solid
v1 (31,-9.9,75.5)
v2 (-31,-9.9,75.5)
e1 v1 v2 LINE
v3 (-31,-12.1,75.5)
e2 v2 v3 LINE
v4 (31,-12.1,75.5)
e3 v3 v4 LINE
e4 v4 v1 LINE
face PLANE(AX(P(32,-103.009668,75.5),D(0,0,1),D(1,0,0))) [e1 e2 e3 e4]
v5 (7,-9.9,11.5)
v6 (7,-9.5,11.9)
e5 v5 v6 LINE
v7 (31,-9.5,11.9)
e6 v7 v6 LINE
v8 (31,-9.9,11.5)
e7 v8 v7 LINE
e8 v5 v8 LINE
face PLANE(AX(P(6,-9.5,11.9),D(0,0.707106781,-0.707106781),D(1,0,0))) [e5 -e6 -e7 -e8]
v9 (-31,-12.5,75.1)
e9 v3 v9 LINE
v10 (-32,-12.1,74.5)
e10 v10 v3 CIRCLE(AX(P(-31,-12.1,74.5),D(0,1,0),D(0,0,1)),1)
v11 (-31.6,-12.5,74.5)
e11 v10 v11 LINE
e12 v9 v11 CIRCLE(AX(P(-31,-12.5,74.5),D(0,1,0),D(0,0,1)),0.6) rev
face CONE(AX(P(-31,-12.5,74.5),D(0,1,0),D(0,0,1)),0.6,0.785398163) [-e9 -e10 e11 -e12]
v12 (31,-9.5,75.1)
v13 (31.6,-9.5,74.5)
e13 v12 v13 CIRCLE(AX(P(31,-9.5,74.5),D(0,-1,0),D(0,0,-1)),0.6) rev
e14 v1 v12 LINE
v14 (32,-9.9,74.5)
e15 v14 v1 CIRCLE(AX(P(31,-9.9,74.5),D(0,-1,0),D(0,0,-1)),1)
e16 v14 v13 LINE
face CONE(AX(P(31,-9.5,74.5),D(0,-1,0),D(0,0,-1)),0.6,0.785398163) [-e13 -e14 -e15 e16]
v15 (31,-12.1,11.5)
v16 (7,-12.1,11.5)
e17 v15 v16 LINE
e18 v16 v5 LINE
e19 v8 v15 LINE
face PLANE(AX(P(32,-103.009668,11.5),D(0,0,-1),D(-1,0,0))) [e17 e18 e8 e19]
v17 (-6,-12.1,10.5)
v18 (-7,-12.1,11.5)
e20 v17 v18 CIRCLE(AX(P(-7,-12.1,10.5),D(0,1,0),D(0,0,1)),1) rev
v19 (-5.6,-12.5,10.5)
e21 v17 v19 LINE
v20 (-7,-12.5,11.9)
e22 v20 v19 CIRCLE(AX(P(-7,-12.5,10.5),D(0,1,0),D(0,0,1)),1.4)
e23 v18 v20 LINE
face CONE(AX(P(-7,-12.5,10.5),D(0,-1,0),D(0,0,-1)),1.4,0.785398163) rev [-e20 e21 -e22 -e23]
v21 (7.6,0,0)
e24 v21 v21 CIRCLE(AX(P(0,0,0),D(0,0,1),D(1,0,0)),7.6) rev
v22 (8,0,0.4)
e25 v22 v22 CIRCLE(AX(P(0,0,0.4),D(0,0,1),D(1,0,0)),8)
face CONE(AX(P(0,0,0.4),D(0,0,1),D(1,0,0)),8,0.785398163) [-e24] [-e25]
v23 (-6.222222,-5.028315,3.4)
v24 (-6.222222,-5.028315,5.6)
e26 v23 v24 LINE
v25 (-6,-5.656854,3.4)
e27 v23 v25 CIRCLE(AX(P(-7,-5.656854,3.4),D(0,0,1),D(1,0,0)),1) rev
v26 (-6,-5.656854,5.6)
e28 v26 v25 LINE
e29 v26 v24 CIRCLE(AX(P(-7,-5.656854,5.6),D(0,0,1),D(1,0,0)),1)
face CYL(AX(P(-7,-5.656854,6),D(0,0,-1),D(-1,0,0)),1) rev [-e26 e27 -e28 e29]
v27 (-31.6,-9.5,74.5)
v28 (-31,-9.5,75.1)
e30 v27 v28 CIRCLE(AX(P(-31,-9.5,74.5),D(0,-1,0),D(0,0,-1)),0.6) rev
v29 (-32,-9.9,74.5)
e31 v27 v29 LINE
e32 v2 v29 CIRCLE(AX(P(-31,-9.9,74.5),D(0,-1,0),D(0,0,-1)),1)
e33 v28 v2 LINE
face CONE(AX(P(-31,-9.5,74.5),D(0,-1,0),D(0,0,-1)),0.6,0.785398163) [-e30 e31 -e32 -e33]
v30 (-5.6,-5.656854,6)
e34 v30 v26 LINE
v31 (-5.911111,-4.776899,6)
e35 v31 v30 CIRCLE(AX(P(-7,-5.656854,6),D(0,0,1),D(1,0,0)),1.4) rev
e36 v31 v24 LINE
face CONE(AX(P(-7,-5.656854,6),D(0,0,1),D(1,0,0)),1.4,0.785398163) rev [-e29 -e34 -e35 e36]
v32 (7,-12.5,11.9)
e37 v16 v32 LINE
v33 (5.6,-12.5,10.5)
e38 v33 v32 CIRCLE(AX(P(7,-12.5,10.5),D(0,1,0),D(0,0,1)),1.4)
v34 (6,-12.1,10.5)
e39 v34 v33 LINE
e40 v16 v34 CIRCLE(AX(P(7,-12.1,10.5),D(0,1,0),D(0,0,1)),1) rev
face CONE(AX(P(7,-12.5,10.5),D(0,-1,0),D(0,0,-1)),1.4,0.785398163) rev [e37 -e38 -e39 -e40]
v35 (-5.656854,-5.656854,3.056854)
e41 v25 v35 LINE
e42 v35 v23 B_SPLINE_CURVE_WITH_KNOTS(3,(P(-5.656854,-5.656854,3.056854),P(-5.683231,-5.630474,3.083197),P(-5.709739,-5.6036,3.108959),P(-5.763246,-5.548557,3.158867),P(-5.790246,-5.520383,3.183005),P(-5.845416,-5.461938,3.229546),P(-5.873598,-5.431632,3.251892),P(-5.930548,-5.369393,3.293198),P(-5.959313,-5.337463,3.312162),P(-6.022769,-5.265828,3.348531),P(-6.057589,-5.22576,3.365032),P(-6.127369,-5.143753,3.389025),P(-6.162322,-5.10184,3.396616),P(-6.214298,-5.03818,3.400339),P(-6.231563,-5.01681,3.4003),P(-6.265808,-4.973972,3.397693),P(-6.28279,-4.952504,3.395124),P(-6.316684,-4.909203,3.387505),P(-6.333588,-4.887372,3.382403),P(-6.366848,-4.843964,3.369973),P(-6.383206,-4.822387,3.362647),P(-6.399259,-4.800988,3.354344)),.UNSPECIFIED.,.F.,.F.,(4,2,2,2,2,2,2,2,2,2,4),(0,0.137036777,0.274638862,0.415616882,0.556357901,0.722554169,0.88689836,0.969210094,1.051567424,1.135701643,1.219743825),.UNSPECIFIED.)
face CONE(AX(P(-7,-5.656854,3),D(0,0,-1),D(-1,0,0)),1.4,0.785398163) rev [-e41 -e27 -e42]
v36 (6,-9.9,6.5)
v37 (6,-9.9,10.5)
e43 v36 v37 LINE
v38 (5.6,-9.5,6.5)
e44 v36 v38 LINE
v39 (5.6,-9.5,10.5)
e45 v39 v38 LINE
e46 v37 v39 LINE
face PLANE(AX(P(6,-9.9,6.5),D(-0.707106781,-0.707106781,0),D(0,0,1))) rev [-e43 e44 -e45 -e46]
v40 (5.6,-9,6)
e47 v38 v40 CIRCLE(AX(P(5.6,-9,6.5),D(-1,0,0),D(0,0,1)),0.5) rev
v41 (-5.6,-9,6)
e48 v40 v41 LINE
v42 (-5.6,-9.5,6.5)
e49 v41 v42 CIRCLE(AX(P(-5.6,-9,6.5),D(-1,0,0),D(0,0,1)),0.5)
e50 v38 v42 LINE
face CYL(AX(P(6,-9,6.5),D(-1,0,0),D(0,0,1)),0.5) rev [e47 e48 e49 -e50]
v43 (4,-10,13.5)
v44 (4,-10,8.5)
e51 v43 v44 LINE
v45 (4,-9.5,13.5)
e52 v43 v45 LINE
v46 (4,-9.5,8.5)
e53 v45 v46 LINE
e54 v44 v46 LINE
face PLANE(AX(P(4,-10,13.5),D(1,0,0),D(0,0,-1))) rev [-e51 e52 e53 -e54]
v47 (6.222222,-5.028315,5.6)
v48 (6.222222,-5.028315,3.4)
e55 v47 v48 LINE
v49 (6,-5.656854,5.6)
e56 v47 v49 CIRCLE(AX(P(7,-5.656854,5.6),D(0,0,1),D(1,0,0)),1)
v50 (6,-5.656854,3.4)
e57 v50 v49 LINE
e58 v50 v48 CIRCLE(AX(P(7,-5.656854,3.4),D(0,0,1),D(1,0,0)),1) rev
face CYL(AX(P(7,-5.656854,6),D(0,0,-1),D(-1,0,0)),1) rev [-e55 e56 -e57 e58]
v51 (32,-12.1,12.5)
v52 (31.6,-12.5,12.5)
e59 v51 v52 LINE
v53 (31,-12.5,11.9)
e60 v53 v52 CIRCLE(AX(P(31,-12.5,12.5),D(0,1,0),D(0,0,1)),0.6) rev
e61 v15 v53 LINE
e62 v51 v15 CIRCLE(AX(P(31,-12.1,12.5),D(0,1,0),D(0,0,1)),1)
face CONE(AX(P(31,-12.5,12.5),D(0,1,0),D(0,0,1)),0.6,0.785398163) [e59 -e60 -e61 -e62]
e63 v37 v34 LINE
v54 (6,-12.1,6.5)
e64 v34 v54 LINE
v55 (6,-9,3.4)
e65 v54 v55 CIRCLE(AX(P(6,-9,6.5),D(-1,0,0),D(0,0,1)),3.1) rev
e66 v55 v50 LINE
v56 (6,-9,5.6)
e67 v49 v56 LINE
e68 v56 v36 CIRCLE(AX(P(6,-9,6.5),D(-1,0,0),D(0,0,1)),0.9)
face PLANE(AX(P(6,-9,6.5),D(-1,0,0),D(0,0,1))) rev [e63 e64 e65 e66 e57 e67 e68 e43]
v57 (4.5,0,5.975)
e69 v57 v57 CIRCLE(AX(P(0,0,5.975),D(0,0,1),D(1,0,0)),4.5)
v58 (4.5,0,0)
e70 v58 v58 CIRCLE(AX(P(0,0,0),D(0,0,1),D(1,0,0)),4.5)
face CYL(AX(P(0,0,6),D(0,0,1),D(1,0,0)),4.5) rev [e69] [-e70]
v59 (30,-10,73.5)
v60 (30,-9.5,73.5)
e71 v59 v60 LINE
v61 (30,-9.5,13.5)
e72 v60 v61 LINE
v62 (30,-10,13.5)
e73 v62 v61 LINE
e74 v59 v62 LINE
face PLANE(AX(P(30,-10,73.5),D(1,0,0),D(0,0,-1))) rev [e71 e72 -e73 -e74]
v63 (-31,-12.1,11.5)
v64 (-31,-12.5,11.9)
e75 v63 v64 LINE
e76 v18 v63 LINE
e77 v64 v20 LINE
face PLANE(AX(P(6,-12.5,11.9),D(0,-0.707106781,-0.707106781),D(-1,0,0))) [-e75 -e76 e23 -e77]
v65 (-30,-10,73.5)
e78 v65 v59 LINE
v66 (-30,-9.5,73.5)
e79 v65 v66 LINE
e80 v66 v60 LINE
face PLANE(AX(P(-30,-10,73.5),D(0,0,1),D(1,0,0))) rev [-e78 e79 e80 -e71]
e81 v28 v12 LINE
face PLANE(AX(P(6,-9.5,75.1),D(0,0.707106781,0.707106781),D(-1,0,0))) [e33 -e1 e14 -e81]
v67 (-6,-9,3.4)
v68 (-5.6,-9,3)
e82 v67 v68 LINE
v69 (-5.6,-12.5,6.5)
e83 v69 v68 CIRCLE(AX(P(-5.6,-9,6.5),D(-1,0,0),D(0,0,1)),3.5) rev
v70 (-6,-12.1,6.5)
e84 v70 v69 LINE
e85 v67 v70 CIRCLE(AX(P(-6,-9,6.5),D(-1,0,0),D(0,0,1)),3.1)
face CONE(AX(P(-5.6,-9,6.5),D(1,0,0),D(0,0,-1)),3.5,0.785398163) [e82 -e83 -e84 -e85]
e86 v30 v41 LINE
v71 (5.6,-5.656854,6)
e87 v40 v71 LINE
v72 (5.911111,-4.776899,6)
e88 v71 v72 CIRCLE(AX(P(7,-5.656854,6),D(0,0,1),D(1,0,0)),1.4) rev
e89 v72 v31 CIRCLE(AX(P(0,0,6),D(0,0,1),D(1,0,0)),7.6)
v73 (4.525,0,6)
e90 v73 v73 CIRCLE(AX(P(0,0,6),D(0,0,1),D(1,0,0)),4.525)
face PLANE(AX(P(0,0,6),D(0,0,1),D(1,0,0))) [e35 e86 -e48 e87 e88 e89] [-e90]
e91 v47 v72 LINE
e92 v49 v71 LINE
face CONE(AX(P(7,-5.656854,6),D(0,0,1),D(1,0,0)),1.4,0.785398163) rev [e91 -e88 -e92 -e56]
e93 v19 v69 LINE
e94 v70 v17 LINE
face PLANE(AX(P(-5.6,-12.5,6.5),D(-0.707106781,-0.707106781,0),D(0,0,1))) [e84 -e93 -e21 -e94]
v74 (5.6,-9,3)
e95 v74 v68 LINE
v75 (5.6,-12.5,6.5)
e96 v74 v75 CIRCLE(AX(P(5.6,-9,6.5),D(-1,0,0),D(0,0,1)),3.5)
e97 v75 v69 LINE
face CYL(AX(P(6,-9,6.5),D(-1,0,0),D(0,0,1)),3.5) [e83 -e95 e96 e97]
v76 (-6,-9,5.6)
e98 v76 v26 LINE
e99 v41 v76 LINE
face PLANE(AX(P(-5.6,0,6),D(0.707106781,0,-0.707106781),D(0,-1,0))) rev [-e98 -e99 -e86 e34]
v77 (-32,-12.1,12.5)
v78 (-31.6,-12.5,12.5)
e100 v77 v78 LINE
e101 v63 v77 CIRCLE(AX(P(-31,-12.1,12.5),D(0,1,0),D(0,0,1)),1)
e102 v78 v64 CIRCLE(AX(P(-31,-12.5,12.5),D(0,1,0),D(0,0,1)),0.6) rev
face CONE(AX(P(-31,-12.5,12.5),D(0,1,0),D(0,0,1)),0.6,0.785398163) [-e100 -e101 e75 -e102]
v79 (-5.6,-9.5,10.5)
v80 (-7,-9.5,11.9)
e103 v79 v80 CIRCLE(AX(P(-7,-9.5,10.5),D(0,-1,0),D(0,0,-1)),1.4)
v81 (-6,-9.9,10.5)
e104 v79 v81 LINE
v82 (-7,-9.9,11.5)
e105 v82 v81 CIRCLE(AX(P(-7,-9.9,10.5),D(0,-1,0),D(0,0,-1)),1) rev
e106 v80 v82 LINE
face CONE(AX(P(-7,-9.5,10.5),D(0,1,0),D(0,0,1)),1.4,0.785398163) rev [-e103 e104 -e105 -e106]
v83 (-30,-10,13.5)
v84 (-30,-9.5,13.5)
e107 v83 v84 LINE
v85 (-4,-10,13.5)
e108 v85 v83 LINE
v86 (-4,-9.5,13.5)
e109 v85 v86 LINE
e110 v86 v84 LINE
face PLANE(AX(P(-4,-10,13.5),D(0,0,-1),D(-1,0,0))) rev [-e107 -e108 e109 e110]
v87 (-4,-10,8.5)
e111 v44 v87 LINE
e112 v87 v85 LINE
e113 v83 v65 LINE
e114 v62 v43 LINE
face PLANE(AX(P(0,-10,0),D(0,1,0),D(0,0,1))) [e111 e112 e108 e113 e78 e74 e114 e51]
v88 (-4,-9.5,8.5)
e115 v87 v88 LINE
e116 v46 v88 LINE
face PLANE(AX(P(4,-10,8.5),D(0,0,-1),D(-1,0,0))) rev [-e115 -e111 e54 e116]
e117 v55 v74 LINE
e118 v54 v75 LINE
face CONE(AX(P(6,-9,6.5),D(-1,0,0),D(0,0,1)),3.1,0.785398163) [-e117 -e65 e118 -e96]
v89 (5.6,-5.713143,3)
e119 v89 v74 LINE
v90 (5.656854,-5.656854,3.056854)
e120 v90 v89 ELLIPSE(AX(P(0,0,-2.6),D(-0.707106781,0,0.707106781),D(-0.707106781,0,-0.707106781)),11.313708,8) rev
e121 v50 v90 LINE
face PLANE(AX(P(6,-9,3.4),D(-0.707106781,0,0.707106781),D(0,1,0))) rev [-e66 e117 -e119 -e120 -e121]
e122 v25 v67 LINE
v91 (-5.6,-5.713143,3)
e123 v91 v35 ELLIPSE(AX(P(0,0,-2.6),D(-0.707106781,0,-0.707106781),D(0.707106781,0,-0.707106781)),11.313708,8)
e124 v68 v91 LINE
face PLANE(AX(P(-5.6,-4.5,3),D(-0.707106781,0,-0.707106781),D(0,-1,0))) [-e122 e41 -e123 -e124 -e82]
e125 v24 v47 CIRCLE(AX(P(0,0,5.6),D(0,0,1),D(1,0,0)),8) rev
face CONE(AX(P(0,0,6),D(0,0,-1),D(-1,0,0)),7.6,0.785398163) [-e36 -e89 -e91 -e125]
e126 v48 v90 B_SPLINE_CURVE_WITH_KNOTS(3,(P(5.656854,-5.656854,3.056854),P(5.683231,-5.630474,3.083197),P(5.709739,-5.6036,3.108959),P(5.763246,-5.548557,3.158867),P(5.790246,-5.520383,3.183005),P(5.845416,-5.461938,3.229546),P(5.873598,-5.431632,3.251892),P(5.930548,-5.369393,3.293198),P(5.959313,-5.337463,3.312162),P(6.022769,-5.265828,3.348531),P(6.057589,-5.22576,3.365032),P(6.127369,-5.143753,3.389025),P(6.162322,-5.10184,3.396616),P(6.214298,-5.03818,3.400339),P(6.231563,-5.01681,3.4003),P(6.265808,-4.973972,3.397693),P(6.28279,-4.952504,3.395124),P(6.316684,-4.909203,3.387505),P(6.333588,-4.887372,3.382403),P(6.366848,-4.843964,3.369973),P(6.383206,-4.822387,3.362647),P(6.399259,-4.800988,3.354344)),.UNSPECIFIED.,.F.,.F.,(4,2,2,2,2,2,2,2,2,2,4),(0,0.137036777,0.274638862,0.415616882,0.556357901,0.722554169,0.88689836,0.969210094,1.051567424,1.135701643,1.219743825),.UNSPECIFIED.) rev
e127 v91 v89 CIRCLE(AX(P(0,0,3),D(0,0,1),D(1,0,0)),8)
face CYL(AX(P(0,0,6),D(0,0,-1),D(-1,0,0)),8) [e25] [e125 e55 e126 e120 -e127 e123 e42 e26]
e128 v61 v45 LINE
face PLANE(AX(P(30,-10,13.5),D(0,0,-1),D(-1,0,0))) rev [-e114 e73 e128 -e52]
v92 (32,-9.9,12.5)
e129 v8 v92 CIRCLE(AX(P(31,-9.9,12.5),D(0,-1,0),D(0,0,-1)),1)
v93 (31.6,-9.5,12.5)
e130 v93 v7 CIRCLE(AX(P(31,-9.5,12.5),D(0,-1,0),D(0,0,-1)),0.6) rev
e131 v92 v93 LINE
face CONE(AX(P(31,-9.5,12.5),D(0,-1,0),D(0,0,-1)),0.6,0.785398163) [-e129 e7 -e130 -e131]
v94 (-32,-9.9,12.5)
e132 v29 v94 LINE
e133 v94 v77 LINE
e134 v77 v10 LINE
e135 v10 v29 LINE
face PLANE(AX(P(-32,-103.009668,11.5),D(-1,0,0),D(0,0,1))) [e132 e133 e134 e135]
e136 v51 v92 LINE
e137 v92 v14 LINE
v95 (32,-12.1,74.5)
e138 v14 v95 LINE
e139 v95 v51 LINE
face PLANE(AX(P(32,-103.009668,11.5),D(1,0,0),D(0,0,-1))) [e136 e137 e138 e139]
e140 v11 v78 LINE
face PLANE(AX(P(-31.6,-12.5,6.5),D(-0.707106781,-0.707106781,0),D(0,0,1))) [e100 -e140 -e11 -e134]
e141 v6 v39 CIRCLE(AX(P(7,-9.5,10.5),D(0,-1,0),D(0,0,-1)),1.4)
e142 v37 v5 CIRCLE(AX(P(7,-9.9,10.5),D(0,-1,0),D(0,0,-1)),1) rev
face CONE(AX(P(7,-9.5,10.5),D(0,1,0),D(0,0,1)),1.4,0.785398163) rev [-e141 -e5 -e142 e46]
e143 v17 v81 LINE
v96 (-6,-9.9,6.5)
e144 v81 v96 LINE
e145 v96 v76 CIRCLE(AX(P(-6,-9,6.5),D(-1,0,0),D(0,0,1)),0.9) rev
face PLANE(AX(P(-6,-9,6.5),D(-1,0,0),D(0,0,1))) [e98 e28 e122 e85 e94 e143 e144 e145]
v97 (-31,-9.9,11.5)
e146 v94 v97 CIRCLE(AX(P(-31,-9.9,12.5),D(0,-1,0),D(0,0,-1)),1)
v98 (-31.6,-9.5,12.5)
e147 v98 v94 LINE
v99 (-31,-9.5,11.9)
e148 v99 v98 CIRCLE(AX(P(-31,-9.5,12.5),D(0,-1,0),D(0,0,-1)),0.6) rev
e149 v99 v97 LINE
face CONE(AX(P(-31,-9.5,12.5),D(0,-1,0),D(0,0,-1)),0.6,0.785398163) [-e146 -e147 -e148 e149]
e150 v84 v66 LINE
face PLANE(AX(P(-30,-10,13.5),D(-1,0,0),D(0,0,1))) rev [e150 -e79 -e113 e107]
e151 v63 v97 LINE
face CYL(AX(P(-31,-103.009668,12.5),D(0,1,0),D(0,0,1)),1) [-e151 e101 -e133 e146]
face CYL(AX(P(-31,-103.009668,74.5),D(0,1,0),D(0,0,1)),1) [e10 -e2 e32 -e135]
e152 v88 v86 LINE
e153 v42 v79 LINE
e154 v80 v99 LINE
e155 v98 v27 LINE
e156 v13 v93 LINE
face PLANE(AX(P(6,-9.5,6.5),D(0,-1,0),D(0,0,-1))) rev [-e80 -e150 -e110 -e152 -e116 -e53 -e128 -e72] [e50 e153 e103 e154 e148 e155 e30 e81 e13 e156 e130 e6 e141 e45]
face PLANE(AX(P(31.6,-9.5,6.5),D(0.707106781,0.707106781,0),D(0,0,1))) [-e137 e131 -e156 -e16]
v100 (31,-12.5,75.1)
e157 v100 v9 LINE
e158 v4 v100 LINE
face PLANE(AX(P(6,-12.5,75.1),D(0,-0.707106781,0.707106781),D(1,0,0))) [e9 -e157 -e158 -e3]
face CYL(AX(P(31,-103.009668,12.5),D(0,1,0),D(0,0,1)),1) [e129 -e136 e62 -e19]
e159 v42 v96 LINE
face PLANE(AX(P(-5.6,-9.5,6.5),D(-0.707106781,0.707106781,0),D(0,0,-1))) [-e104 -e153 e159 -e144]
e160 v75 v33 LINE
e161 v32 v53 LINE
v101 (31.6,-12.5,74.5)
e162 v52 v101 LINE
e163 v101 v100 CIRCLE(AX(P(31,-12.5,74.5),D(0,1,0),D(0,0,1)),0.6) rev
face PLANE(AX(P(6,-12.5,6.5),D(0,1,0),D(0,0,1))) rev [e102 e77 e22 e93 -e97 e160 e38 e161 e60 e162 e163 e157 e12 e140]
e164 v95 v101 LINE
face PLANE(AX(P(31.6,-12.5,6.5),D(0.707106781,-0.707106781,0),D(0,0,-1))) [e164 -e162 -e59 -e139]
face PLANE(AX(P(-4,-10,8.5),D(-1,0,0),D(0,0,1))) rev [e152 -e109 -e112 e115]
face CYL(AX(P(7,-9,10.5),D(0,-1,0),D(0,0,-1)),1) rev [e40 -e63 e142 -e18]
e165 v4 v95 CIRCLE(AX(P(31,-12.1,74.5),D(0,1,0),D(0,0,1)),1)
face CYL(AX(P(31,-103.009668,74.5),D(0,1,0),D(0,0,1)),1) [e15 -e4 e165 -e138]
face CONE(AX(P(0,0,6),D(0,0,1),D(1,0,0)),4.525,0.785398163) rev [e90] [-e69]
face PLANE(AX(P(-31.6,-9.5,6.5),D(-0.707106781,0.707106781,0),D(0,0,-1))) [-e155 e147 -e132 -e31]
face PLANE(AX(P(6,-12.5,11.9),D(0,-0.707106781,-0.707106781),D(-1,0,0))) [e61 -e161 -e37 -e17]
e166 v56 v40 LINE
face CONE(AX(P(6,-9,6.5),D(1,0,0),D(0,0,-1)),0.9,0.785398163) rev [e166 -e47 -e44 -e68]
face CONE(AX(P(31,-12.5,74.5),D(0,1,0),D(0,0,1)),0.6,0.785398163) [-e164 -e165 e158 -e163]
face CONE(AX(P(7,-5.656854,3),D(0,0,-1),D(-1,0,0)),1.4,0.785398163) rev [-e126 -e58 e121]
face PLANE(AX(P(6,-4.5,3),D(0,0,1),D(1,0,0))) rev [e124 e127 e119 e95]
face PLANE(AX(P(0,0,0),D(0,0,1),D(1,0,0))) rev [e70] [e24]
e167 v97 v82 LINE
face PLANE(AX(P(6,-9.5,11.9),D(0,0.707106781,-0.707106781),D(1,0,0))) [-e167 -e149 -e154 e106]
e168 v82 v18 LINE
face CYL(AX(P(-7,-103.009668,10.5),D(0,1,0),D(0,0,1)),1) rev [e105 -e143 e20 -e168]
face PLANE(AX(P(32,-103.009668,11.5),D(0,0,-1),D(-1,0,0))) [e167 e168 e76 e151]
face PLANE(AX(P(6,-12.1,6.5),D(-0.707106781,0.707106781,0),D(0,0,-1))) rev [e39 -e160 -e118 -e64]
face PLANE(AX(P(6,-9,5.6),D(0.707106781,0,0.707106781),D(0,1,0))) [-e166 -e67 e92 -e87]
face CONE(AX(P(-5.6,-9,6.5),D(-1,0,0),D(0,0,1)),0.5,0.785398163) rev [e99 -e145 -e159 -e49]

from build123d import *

# Parameters (mm, degrees)
SKETCH1_R                      = 8
BOSS_EXTRUDE1_DEPTH            = 6
BOSS_EXTRUDE2_DEPTH            = 6
SKETCH5_W                      = 64
SKETCH5_H                      = 64
BOSS_EXTRUDE3_DEPTH            = 3
CUT_EXTRUDE1_DEPTH             = 0.5
FILLET2_R                      = 1
M8_CLEARANCE_HOLE1_D           = 9
M8_CLEARANCE_HOLE1_CSINK_D     = 9.05
M8_CLEARANCE_HOLE1_CSINK_ANGLE = 90
CHAMFER1_SIZE                  = 0.4


with BuildPart() as part:
    # Sketch1 → Boss-Extrude1 (new body)
    with BuildSketch(Plane.XY):
        Circle(SKETCH1_R)
    extrude(amount=BOSS_EXTRUDE1_DEPTH)

    # Sketch4 → Boss-Extrude2 (add, symmetric)
    with BuildSketch(Plane(origin=(0, 0, 0), x_dir=(0, 0, -1), z_dir=(1, 0, 0))):
        with BuildLine():
            Line((-6, -4.5), (-6, -9))
            ThreePointArc((-6, -9), (-6.146446609, -9.353553391), (-6.5, -9.5))
            Line((-6.5, -9.5), (-11.5, -9.5))
            Line((-11.5, -9.5), (-11.5, -12.5))
            Line((-11.5, -12.5), (-6.5, -12.5))
            ThreePointArc((-6.5, -12.5), (-4.025126266, -11.474873734), (-3, -9))
            Line((-3, -9), (-3, -4.5))
            Line((-3, -4.5), (-6, -4.5))
        make_face()
    extrude(amount=BOSS_EXTRUDE2_DEPTH, both=True)

    # Sketch5 → Boss-Extrude3 (add)
    with BuildSketch(Plane(origin=(0, -9.5, 0), x_dir=(1, 0, 0), z_dir=(0, 1, 0))):
        with Locations((0, -43.5)):
            Rectangle(SKETCH5_W, SKETCH5_H)
    extrude(amount=-BOSS_EXTRUDE3_DEPTH)

    # Sketch6 → Cut-Extrude1 (cut)
    with BuildSketch(Plane(origin=(0, -9.5, 0), x_dir=(1, 0, 0), z_dir=(0, 1, 0))):
        Polygon((-4, -8.5), (-4, -13.5), (-30, -13.5), (-30, -73.5), (30, -73.5), (30, -13.5), (4, -13.5), (4, -8.5), align=None)
    extrude(amount=-CUT_EXTRUDE1_DEPTH, mode=Mode.SUBTRACT)

    # Fillet2
    fillet2_edges = [part.edges().sort_by_distance(p)[0] for p in [
        (6, -11, 11.5),
        (-6, -11, 11.5),
        (-6, -5.291502622, 4.5),
        (32, -11, 11.5),
        (32, -11, 75.5),
        (-32, -11, 75.5),
        (-32, -11, 11.5),
        (6, -5.291502622, 4.5),
    ]]
    fillet(fillet2_edges, radius=FILLET2_R)

    # M8 Clearance Hole1 (through all)
    with Locations(Plane.XY.offset(6)):
        with Locations((0, 0)):
            CounterSinkHole(M8_CLEARANCE_HOLE1_D / 2, M8_CLEARANCE_HOLE1_CSINK_D / 2, counter_sink_angle=M8_CLEARANCE_HOLE1_CSINK_ANGLE)

    # Chamfer1
    # the kernel refuses this chamfer: 0.4 mm, written as the material it takes off along each edge
    with BuildSketch(Plane(origin=(6, -9.5, 6.5), x_dir=(0.027495876610587302, -0.9996219169112966, 0), z_dir=(0, 0, 1)), Plane(origin=(-6, -12.5, 10.5), x_dir=(0.9996219169112966, -0.027495876610587302, 0), z_dir=(0, 0, -1))) as chamfer1_piece_1:
        Polygon((CHAMFER1_SIZE * 0.999621916911, -CHAMFER1_SIZE * 0.0274958766106), (-CHAMFER1_SIZE * 0.0274958766106, -CHAMFER1_SIZE * 0.999621916911), (0, 0), align=None)
    extrude(amount=4, mode=Mode.SUBTRACT)
    with BuildSketch(Plane(origin=(6, -9, 6.5), x_dir=(0, -1, 0), z_dir=(0, 0, 1))) as chamfer1_piece_2:
        Polygon((3.5, -CHAMFER1_SIZE), (3.5 - CHAMFER1_SIZE, 0), (3.5, 0), align=None)
    revolve(axis=Axis((6, -9, 6.5), (1, 0, 0)), revolution_arc=90, mode=Mode.SUBTRACT)
    with BuildSketch(Plane(origin=(-6, -9, 6.5), x_dir=(0, 0, -1), z_dir=(0, 1, 0))) as chamfer1_piece_3:
        Polygon((0.5 + CHAMFER1_SIZE, 0), (0.5, -CHAMFER1_SIZE), (0.5, 0), align=None)
    revolve(axis=Axis((-6, -9, 6.5), (-1, 0, 0)), revolution_arc=90, mode=Mode.SUBTRACT)
    with BuildSketch(Plane(origin=(-6, -9.5, 6.5), x_dir=(-0.027495876610587302, -0.9996219169112966, 0), z_dir=(0, 0, 1)), Plane(origin=(6, -12.5, 10.5), x_dir=(-0.9996219169112966, -0.027495876610587302, 0), z_dir=(0, 0, -1))) as chamfer1_piece_4:
        Polygon((CHAMFER1_SIZE * 0.999621916911, CHAMFER1_SIZE * 0.0274958766106), (-CHAMFER1_SIZE * 0.0274958766106, CHAMFER1_SIZE * 0.999621916911), (0, 0), align=None)
    extrude(amount=4, mode=Mode.SUBTRACT)
    with BuildSketch(Plane(origin=(-6, -9, 6.5), x_dir=(0, -1, 0), z_dir=(0, 0, 1))) as chamfer1_piece_5:
        Polygon((3.5 - CHAMFER1_SIZE, 0), (3.5, CHAMFER1_SIZE), (3.5, 0), align=None)
    revolve(axis=Axis((-6, -9, 6.5), (1, 0, 0)), revolution_arc=90, mode=Mode.SUBTRACT)
    with BuildSketch(Plane(origin=(-6, -9, 3), x_dir=(-0.02749587661058736, 0, 0.9996219169112966), z_dir=(0, 1, 0))) as chamfer1_piece_6_section:
        Polygon((CHAMFER1_SIZE * 0.999621916911, CHAMFER1_SIZE * 0.0274958766106), (-CHAMFER1_SIZE * 0.0274958766106, CHAMFER1_SIZE * 0.999621916911), (0, 0), align=None)
    chamfer1_piece_6 = extrude(amount=3.343145751, mode=Mode.PRIVATE)
    chamfer1_piece_6 = chamfer1_piece_6 - Plane(origin=(0, 0, 3.170790462), x_dir=(1, 0, 0), z_dir=(0, 0, -1)) * Cylinder(8, 9, mode=Mode.PRIVATE)
    add(chamfer1_piece_6, mode=Mode.SUBTRACT)
    with BuildSketch(Plane(origin=(0, 0, 0), x_dir=(1, 0, 0), z_dir=(0, -1, 0))) as chamfer1_piece_7:
        Polygon((8 - CHAMFER1_SIZE, 0), (8, CHAMFER1_SIZE), (8, 0), align=None)
    revolve(axis=Axis((0, 0, 0), (0, 0, 1)), mode=Mode.SUBTRACT)
    with BuildSketch(Plane(origin=(0, 0, 6), x_dir=(1, 0, 0), z_dir=(0, -1, 0))) as chamfer1_piece_8:
        Polygon((8 - CHAMFER1_SIZE, 0), (8, -CHAMFER1_SIZE), (8, 0), align=None)
    revolve(axis=Axis((0, 0, 6), (0, 0, 1)), revolution_arc=218.942441269, mode=Mode.SUBTRACT)
    with BuildSketch(Plane(origin=(-6, -5.656854249, 6), x_dir=(-0.027495876610587302, 0, -0.9996219169112966), z_dir=(0, -1, 0)), Plane(origin=(6, -5.656854249, 6), x_dir=(-0.9996219169112966, 0, 0.027495876610587302), z_dir=(0, -1, 0))) as chamfer1_piece_9:
        Polygon((CHAMFER1_SIZE * 0.999621916911, CHAMFER1_SIZE * 0.0274958766106), (-CHAMFER1_SIZE * 0.0274958766106, CHAMFER1_SIZE * 0.999621916911), (0, 0), align=None)
    extrude(amount=3.343145751, mode=Mode.SUBTRACT)
    with BuildSketch(Plane(origin=(31, -9.5, 11.5), x_dir=(0, -0.9996219169112966, -0.027495876610587302), z_dir=(-1, 0, 0)), Plane(origin=(-7, -9.5, 11.5), x_dir=(0, -0.9996219169112966, -0.027495876610587302), z_dir=(-1, 0, 0)), Plane(origin=(-7, -12.5, 11.5), x_dir=(0, -0.027495876610587302, 0.9996219169112966), z_dir=(-1, 0, 0))) as chamfer1_piece_10:
        Polygon((CHAMFER1_SIZE * 0.999621916911, CHAMFER1_SIZE * 0.0274958766106), (-CHAMFER1_SIZE * 0.0274958766106, CHAMFER1_SIZE * 0.999621916911), (0, 0), align=None)
    extrude(amount=24, mode=Mode.SUBTRACT)
    with BuildSketch(Plane(origin=(31, -12.5, 11.5), x_dir=(0, 0.9996219169112966, -0.027495876610587302), z_dir=(-1, 0, 0))) as chamfer1_piece_11:
        Polygon((CHAMFER1_SIZE * 0.999621916911, -CHAMFER1_SIZE * 0.0274958766106), (-CHAMFER1_SIZE * 0.0274958766106, -CHAMFER1_SIZE * 0.999621916911), (0, 0), align=None)
    extrude(amount=24, mode=Mode.SUBTRACT)
    with BuildSketch(Plane(origin=(32, -12.5, 74.5), x_dir=(-0.9996219169112966, -0.02749587661058742, 0), z_dir=(0, 0, -1)), Plane(origin=(32, -9.5, 74.5), x_dir=(0.027495876610578673, -0.999621916911297, 0), z_dir=(0, 0, -1)), Plane(origin=(-32, -9.5, 12.5), x_dir=(-0.027495876610578673, -0.999621916911297, 0), z_dir=(0, 0, 1)), Plane(origin=(-31, -9.5, 75.5), x_dir=(0, -0.9996219169112964, 0.027495876610595927), z_dir=(1, 0, 0)), Plane(origin=(-31, -12.5, 75.5), x_dir=(0, -0.02749587661058671, -0.9996219169112966), z_dir=(1, 0, 0)), Plane(origin=(-32, -12.5, 12.5), x_dir=(0.9996219169112966, -0.02749587661058742, 0), z_dir=(0, 0, 1))) as chamfer1_piece_12:
        Polygon((CHAMFER1_SIZE * 0.999621916911, CHAMFER1_SIZE * 0.0274958766106), (-CHAMFER1_SIZE * 0.0274958766106, CHAMFER1_SIZE * 0.999621916911), (0, 0), align=None)
    extrude(amount=62, mode=Mode.SUBTRACT)
    with BuildSketch(Plane(origin=(-31, -9.5, 12.5), x_dir=(-1, 0, 0), z_dir=(0, 0, 1))) as chamfer1_piece_13:
        Polygon((1, CHAMFER1_SIZE), (1 - CHAMFER1_SIZE, 0), (1, 0), align=None)
    revolve(axis=Axis((-31, -9.5, 12.5), (0, -1, 0)), revolution_arc=90, mode=Mode.SUBTRACT)
    with BuildSketch(Plane(origin=(-31, -9.5, 74.5), x_dir=(0, 0, 1), z_dir=(1, 0, 0))) as chamfer1_piece_14:
        Polygon((1, CHAMFER1_SIZE), (1 - CHAMFER1_SIZE, 0), (1, 0), align=None)
    revolve(axis=Axis((-31, -9.5, 74.5), (0, -1, 0)), revolution_arc=90, mode=Mode.SUBTRACT)
    with BuildSketch(Plane(origin=(31, -9.5, 74.5), x_dir=(1, 0, 0), z_dir=(0, 0, -1))) as chamfer1_piece_15:
        Polygon((1, CHAMFER1_SIZE), (1 - CHAMFER1_SIZE, 0), (1, 0), align=None)
    revolve(axis=Axis((31, -9.5, 74.5), (0, -1, 0)), revolution_arc=90, mode=Mode.SUBTRACT)
    with BuildSketch(Plane(origin=(31, -9.5, 12.5), x_dir=(0, 0, -1), z_dir=(-1, 0, 0))) as chamfer1_piece_16:
        Polygon((1, CHAMFER1_SIZE), (1 - CHAMFER1_SIZE, 0), (1, 0), align=None)
    revolve(axis=Axis((31, -9.5, 12.5), (0, -1, 0)), revolution_arc=90, mode=Mode.SUBTRACT)
    with BuildSketch(Plane(origin=(-31, -12.5, 12.5), x_dir=(-1, 0, 0), z_dir=(0, 0, 1))) as chamfer1_piece_17:
        Polygon((1 - CHAMFER1_SIZE, 0), (1, -CHAMFER1_SIZE), (1, 0), align=None)
    revolve(axis=Axis((-31, -12.5, 12.5), (0, -1, 0)), revolution_arc=90, mode=Mode.SUBTRACT)
    with BuildSketch(Plane(origin=(-31, -12.5, 74.5), x_dir=(0, 0, 1), z_dir=(1, 0, 0))) as chamfer1_piece_18:
        Polygon((1 - CHAMFER1_SIZE, 0), (1, -CHAMFER1_SIZE), (1, 0), align=None)
    revolve(axis=Axis((-31, -12.5, 74.5), (0, -1, 0)), revolution_arc=90, mode=Mode.SUBTRACT)
    with BuildSketch(Plane(origin=(31, -12.5, 74.5), x_dir=(1, 0, 0), z_dir=(0, 0, -1))) as chamfer1_piece_19:
        Polygon((1 - CHAMFER1_SIZE, 0), (1, -CHAMFER1_SIZE), (1, 0), align=None)
    revolve(axis=Axis((31, -12.5, 74.5), (0, -1, 0)), revolution_arc=90, mode=Mode.SUBTRACT)
    with BuildSketch(Plane(origin=(6, -9, 3), x_dir=(-0.9996219169112968, 0, -0.027495876610586226), z_dir=(0, 1, 0))) as chamfer1_piece_20_section:
        Polygon((CHAMFER1_SIZE * 0.999621916911, CHAMFER1_SIZE * 0.0274958766106), (-CHAMFER1_SIZE * 0.0274958766106, CHAMFER1_SIZE * 0.999621916911), (0, 0), align=None)
    chamfer1_piece_20 = extrude(amount=3.343145751, mode=Mode.PRIVATE)
    chamfer1_piece_20 = chamfer1_piece_20 - Plane(origin=(0, 0, 3.119938156), x_dir=(1, 0, 0), z_dir=(0, 0, -1)) * Cylinder(8, 9, mode=Mode.PRIVATE)
    add(chamfer1_piece_20, mode=Mode.SUBTRACT)
    with BuildSketch(Plane(origin=(31, -12.5, 12.5), x_dir=(0, 0, -1), z_dir=(-1, 0, 0))) as chamfer1_piece_21:
        Polygon((1 - CHAMFER1_SIZE, 0), (1, -CHAMFER1_SIZE), (1, 0), align=None)
    revolve(axis=Axis((31, -12.5, 12.5), (0, -1, 0)), revolution_arc=90, mode=Mode.SUBTRACT)
    with BuildSketch(Plane(origin=(-7, -5.656854249, 6), x_dir=(1, 0, 0), z_dir=(0, -1, 0))) as chamfer1_piece_22:
        Polygon((1 + CHAMFER1_SIZE, 0), (1, -CHAMFER1_SIZE), (1, 0), align=None)
    revolve(axis=Axis((-7, -5.656854249, 6), (0, 0, 1)), revolution_arc=38.942441269, mode=Mode.SUBTRACT)
    with BuildSketch(Plane(origin=(-7, -5.656854249, 3), x_dir=(1, 0, 0), z_dir=(0, -1, 0))) as chamfer1_piece_23_section:
        Polygon((1, CHAMFER1_SIZE), (1 + CHAMFER1_SIZE, 0), (1, 0), align=None)
    chamfer1_piece_23 = revolve(axis=Axis((-7, -5.656854249, 3), (0, 0, 1)), revolution_arc=97.885505576, mode=Mode.PRIVATE)
    chamfer1_piece_23 = chamfer1_piece_23 - Plane(origin=(0, 0, 3.19057738), x_dir=(1, 0, 0), z_dir=(0, 0, -1)) * Cylinder(8, 6, mode=Mode.PRIVATE)
    add(chamfer1_piece_23, mode=Mode.SUBTRACT)
    with BuildSketch(Plane(origin=(7, -5.656854249, 6), x_dir=(-1, 0, 0), z_dir=(0, -1, 0))) as chamfer1_piece_24:
        Polygon((1 + CHAMFER1_SIZE, 0), (1, CHAMFER1_SIZE), (1, 0), align=None)
    revolve(axis=Axis((7, -5.656854249, 6), (0, 0, -1)), revolution_arc=38.942441269, mode=Mode.SUBTRACT)
    with BuildSketch(Plane(origin=(7, -5.656854249, 3), x_dir=(-1, 0, 0), z_dir=(0, -1, 0))) as chamfer1_piece_25_section:
        Polygon((1, -CHAMFER1_SIZE), (1 + CHAMFER1_SIZE, 0), (1, 0), align=None)
    chamfer1_piece_25 = revolve(axis=Axis((7, -5.656854249, 3), (0, 0, -1)), revolution_arc=97.885505576, mode=Mode.PRIVATE)
    chamfer1_piece_25 = chamfer1_piece_25 - Plane(origin=(0, 0, 3.190577372), x_dir=(1, 0, 0), z_dir=(0, 0, -1)) * Cylinder(8, 6, mode=Mode.PRIVATE)
    add(chamfer1_piece_25, mode=Mode.SUBTRACT)
    with BuildSketch(Plane(origin=(7, -12.5, 10.5), x_dir=(0, 0, 1), z_dir=(1, 0, 0))) as chamfer1_piece_26:
        Polygon((1 + CHAMFER1_SIZE, 0), (1, -CHAMFER1_SIZE), (1, 0), align=None)
    revolve(axis=Axis((7, -12.5, 10.5), (0, -1, 0)), revolution_arc=90, mode=Mode.SUBTRACT)
    with BuildSketch(Plane(origin=(7, -9.5, 10.5), x_dir=(0, 0, 1), z_dir=(1, 0, 0))) as chamfer1_piece_27:
        Polygon((1, CHAMFER1_SIZE), (1 + CHAMFER1_SIZE, 0), (1, 0), align=None)
    revolve(axis=Axis((7, -9.5, 10.5), (0, -1, 0)), revolution_arc=90, mode=Mode.SUBTRACT)
    with BuildSketch(Plane(origin=(-7, -12.5, 10.5), x_dir=(1, 0, 0), z_dir=(0, 0, -1))) as chamfer1_piece_28:
        Polygon((1 + CHAMFER1_SIZE, 0), (1, -CHAMFER1_SIZE), (1, 0), align=None)
    revolve(axis=Axis((-7, -12.5, 10.5), (0, -1, 0)), revolution_arc=90, mode=Mode.SUBTRACT)
    with BuildSketch(Plane(origin=(6, -9, 6.5), x_dir=(0, 0, -1), z_dir=(0, 1, 0))) as chamfer1_piece_29:
        Polygon((0.5, CHAMFER1_SIZE), (0.5 + CHAMFER1_SIZE, 0), (0.5, 0), align=None)
    revolve(axis=Axis((6, -9, 6.5), (-1, 0, 0)), revolution_arc=90, mode=Mode.SUBTRACT)
    with BuildSketch(Plane(origin=(-7, -9.5, 10.5), x_dir=(1, 0, 0), z_dir=(0, 0, -1))) as chamfer1_piece_30:
        Polygon((1, CHAMFER1_SIZE), (1 + CHAMFER1_SIZE, 0), (1, 0), align=None)
    revolve(axis=Axis((-7, -9.5, 10.5), (0, -1, 0)), revolution_arc=90, mode=Mode.SUBTRACT)
    with BuildSketch(Plane(origin=(0, 0, 6), x_dir=(0.7777777777777778, -0.628539361054709, 0), z_dir=(-0.628539361054709, -0.7777777777777778, 0))) as chamfer1_piece_31:
        Polygon((8 - CHAMFER1_SIZE, 0), (8, -CHAMFER1_SIZE), (8, 0), align=None)
    revolve(axis=Axis((0, 0, 6), (0, 0, 1)), revolution_arc=38.942441269, mode=Mode.SUBTRACT)


solid = part.part
